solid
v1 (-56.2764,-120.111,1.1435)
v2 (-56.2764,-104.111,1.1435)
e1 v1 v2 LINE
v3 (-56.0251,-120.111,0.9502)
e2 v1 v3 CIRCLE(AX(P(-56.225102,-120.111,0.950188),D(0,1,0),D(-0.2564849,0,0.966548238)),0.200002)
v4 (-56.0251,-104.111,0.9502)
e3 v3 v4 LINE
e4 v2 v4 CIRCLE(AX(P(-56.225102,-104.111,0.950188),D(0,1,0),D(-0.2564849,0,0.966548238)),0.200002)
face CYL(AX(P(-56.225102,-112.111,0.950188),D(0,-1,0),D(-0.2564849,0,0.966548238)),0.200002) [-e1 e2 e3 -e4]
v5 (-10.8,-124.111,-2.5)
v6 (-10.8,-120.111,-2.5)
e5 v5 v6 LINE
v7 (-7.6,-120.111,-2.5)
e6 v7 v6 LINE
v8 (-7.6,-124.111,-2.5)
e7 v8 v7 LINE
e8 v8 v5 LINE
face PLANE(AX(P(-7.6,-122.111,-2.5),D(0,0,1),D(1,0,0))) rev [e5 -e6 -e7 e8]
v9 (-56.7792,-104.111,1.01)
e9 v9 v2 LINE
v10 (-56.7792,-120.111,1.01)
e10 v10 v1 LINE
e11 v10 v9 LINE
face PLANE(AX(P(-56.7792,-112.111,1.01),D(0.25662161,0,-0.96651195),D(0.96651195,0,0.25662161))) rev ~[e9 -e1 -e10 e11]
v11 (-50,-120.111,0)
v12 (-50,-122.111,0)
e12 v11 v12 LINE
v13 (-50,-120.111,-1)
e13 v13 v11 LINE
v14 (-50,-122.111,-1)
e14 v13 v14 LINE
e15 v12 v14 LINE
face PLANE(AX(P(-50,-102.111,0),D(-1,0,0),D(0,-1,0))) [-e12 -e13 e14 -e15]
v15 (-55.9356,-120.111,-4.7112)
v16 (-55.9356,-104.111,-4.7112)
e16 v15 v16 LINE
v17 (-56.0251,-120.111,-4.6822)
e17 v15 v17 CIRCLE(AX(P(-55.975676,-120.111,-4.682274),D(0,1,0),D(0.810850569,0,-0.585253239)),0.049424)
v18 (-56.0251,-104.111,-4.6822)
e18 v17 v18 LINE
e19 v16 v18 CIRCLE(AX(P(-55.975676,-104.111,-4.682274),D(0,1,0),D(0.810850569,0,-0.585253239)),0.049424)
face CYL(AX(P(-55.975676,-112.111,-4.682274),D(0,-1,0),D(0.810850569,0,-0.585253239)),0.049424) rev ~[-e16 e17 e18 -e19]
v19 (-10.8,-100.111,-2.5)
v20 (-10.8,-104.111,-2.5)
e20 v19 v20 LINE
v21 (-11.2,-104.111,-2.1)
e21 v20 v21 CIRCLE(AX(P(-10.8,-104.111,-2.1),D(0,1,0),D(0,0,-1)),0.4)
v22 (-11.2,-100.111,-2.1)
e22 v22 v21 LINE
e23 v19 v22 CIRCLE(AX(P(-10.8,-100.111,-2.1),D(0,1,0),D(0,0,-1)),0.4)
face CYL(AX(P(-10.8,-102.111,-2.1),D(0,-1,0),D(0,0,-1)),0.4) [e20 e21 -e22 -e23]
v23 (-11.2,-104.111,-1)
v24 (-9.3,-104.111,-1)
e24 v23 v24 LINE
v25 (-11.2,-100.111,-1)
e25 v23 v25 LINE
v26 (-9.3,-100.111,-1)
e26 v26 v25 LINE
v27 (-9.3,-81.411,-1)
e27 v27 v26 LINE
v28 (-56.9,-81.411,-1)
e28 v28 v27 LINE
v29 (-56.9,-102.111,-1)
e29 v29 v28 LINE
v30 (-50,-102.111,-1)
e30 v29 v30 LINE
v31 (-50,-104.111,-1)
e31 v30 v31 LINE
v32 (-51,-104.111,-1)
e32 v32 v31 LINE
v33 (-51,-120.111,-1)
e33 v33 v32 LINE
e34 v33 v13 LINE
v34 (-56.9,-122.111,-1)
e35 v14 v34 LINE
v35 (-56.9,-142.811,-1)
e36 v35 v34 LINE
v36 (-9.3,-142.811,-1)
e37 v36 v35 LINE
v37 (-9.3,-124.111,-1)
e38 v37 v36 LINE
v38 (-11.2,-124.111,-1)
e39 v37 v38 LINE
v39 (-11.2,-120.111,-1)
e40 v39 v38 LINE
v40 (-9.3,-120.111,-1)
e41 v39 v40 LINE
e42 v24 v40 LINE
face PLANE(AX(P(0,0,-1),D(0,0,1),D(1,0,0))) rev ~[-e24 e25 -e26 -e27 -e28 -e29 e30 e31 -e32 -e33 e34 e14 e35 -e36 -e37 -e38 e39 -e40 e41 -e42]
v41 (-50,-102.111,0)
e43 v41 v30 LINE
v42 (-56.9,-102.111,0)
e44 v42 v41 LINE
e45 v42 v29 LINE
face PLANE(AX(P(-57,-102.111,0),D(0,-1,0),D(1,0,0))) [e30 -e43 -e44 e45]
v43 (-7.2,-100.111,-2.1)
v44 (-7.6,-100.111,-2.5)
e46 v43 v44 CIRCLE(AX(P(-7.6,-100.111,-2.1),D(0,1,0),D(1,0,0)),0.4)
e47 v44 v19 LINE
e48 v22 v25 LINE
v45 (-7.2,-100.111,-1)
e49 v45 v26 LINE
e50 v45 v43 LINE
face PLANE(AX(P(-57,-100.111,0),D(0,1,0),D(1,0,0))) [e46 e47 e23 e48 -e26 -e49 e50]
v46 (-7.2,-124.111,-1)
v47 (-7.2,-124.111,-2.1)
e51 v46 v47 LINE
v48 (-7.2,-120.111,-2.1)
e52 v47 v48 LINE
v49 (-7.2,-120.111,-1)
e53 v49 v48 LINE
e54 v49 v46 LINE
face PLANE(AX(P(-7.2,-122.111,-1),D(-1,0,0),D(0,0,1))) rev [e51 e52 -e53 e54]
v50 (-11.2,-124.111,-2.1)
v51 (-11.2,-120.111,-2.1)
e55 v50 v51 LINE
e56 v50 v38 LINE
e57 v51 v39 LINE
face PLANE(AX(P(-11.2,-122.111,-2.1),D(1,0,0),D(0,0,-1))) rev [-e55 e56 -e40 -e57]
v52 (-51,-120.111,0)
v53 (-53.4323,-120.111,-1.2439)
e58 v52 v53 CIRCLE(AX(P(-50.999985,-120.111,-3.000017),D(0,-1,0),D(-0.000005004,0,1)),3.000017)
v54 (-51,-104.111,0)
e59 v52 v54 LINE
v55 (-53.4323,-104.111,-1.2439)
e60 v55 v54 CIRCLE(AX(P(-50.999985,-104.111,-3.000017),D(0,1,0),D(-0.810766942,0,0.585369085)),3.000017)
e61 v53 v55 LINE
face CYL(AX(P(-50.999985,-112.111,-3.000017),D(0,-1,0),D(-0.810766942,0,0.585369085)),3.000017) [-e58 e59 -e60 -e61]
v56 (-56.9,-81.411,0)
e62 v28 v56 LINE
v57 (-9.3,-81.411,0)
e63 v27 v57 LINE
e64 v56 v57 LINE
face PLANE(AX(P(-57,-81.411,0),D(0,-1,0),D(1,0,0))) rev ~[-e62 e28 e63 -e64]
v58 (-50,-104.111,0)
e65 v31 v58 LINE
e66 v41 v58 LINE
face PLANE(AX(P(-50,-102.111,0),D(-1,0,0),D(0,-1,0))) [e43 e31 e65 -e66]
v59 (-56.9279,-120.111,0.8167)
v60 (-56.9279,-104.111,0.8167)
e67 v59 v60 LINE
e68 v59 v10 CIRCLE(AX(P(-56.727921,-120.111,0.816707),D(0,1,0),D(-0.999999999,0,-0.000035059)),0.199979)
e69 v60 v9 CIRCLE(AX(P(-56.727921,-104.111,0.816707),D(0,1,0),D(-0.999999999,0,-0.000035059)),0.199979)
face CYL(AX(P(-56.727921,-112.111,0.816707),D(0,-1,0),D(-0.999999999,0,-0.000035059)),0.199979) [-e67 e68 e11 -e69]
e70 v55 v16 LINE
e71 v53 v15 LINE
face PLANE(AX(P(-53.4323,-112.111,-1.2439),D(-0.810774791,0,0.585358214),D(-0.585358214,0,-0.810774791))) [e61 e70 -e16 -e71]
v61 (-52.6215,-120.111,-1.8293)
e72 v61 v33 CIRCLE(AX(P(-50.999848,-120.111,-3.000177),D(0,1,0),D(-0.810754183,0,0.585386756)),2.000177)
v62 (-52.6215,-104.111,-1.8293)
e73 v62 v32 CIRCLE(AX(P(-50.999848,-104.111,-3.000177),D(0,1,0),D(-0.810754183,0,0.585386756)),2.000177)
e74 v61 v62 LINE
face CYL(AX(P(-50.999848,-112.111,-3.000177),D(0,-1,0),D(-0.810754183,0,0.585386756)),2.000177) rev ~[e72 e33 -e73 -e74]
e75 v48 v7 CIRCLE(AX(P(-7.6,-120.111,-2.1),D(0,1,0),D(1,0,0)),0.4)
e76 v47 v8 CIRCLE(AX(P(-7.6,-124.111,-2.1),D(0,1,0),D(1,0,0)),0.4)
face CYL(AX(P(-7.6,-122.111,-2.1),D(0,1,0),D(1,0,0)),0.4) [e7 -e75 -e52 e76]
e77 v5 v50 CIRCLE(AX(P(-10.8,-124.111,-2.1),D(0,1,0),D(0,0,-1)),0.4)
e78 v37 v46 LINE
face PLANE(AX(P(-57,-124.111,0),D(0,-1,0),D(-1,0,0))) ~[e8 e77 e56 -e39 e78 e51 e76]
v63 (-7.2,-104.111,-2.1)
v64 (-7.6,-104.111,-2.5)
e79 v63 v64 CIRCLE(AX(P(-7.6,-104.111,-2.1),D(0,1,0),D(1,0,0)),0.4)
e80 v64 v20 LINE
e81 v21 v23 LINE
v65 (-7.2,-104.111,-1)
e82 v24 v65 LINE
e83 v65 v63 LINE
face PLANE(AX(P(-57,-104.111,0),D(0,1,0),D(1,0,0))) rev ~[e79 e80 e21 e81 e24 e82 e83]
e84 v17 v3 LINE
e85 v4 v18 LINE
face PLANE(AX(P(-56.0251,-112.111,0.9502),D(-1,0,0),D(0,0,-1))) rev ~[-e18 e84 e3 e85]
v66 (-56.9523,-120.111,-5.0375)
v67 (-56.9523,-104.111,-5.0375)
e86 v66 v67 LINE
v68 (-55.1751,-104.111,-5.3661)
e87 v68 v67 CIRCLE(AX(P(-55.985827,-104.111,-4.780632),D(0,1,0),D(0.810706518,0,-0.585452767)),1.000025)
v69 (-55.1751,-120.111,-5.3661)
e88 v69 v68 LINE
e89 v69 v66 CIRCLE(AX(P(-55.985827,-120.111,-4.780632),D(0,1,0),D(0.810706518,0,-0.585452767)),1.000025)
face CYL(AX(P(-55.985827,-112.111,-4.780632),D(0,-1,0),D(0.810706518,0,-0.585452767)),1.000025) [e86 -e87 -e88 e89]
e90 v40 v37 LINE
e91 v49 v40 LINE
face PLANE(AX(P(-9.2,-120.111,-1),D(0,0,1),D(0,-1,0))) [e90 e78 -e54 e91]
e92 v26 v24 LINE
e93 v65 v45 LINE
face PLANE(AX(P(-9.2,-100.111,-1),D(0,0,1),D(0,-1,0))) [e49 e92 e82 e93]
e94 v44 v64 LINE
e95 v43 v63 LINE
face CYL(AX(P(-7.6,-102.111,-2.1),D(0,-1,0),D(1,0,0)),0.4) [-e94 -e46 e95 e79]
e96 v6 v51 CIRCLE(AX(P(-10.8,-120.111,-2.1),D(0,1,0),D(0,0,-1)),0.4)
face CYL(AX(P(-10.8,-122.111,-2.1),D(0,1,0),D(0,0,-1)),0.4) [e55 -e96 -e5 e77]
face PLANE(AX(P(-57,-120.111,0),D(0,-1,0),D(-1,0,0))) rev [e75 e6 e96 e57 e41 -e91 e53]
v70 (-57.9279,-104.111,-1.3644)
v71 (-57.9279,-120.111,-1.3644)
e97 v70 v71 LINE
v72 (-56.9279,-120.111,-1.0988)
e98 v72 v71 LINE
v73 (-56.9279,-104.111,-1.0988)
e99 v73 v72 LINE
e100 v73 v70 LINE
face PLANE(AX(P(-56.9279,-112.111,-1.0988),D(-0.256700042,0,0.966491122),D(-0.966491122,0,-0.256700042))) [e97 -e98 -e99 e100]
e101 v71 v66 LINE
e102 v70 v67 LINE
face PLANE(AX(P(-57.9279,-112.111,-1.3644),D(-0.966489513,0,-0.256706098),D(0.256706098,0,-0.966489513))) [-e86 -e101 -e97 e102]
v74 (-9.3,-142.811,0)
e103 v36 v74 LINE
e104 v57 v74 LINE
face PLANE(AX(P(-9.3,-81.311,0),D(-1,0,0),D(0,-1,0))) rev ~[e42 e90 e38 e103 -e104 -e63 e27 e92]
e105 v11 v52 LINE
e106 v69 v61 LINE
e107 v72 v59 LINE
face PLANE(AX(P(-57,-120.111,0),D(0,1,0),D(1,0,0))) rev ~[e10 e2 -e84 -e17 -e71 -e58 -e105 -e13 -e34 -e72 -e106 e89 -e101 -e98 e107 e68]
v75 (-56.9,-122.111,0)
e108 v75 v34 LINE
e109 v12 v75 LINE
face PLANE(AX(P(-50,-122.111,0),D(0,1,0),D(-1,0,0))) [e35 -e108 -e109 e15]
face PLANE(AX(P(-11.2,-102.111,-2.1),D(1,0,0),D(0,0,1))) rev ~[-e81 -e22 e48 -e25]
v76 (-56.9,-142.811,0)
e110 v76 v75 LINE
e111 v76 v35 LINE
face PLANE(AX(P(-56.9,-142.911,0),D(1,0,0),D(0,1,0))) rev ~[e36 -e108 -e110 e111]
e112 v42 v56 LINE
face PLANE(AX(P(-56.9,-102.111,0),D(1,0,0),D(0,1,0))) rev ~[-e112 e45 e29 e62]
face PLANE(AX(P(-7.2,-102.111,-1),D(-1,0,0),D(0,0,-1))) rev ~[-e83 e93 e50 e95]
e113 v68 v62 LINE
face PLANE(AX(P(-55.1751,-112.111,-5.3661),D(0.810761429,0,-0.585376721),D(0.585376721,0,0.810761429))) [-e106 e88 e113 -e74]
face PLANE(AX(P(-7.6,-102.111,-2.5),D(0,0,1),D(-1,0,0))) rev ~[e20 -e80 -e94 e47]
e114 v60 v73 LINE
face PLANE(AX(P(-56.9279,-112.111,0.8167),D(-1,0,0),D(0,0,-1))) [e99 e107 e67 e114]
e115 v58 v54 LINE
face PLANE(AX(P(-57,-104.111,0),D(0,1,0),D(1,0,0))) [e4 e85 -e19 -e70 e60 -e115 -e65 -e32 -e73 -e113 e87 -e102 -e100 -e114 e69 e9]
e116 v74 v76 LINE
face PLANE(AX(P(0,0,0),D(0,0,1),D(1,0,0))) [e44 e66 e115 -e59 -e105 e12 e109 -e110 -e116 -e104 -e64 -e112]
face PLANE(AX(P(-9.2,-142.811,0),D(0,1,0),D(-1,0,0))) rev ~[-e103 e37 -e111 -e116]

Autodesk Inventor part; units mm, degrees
ref_plane "YZ Plane" through (0, 0, 0) normal (1, 0, 0) x (0, 1, 0)
ref_plane "Work Plane1" through (0, 0, 0) normal (0, 0, 1) x (1, 0, 0)
sketch "Sketch1" plane through (0, 0, 0) normal (0, 0, 1) x (1, 0, 0)
  line L0 (-60, -142.911) -> (-60, -152.111) construction
  line L1 (0, -152.111) -> (-60, -152.111) construction
  line L2 (0, -142.911) -> (0, -152.111) construction
  line L3 (-57, -81.311) -> (-9.2, -81.311)
  line L4 (-9.2, -81.311) -> (-9.2, -142.911)
  line L5 (-9.2, -142.911) -> (-57, -142.911)
  line L6 (-57, -142.911) -> (-57, -81.311)
  line L7 (-57, -112.111) -> (-9.2, -112.111) construction
  line L8 (-57, -102.111) -> (-50, -102.111)
  line L9 (-50, -102.111) -> (-50, -122.111)
  line L10 (-50, -122.111) -> (-57, -122.111)
  line L11 (-57, -122.111) -> (-57, -102.111)
  line L12 (0, -142.911) -> (-60, -142.911) projected
  point P0 (0, 0)
  dimension "d0" = 20
  dimension "d1" = 7
extrude "Extrusion1" add sketch "Sketch1" against normal blind 1 contours L3 L4 L5 L6 L10 L9 L8
ref_plane "Work Plane2" through (-57, -112.111, 0) normal (0, 1, 0) x (1, 0, 0)
sketch "Sketch2" plane through (-57, -112.111, 0) normal (0, 1, 0) x (1, 0, 0)
  line L0 (7, 0) -> (0, 0) construction
  line L1 (7, 0) -> (7, 1) construction
  line L2 (0, 1) -> (7, 1) construction
  line L3 (0, 0) -> (0, 1) construction
  line L4 (0.0721, -0.8167) -> (0.0721, 1.0988)
  line L5 (0.0721, 1.0988) -> (-0.9279, 1.3644)
  line L6 (-0.9279, 1.3644) -> (0.0477, 5.0375)
  arc A0 (1.8249, 5.3661) -> (0.0477, 5.0375) centre (1.0142, 4.7807) ccw
  line L7 (1.8249, 5.3661) -> (4.3785, 1.8293)
  arc A1 (4.3785, 1.8293) -> (6, 1) centre (6, 3) ccw
  line L8 (6, 1) -> (7, 1)
  line L9 (7, 1) -> (7, 0)
  line L10 (7, 0) -> (6, 0)
  arc A2 (3.5677, 1.2439) -> (6, 0) centre (6, 3) ccw
  line L11 (3.5677, 1.2439) -> (1.0644, 4.7112)
  arc A3 (1.0644, 4.7112) -> (0.9749, 4.6822) centre (1.0243, 4.6822) ccw
  line L12 (47.8, 0) -> (0, 0) projected
  line L13 (47.8, 1) -> (0, 1) projected
  line L14 (6, 0) -> (6, 1) construction
  line L15 (0.9749, -0.9502) -> (0.9749, 4.6822)
  line L16 (0.2208, -1.01) -> (0.7236, -1.1435)
  arc A4 (0.7236, -1.1435) -> (0.9749, -0.9502) centre (0.7749, -0.9502) ccw
  arc A5 (0.0721, -0.8167) -> (0.2208, -1.01) centre (0.2721, -0.8167) ccw
  point P0 (57, 0)
  point P1 (0.9749, -1.2103)
  point P2 (0.0721, -0.9705)
  dimension "d8" = 1
  dimension "d9" = 1
  dimension "d11" = 1
  dimension "d12" = 0.0494
  dimension "d22" = 1
  dimension "d23" = 2
  dimension "d32" = 2
  dimension "d34" = 2.5
  dimension "d36" = 0.2
  dimension "d37" = 0.9874
  dimension "d38" = 1
  dimension "d39" = 125.829
  dimension "d40" = 3.8003
extrude "Extrusion2" add sketch "Sketch2" along normal mid plane 16 contours L4 L12 L15 A4 L16 A5 | L4 L13 L15 L12 | L4 L5 L6 A0 L7 A1 L13 A2 L11 A3 L15 | A2 L13 L8 L9 L10
ref_plane "Work Plane3" through (-57, -102.111, 0) normal (0, 1, 0) x (1, 0, 0)
sketch "Sketch4" plane through (-57, -102.111, 0) normal (0, 1, 0) x (1, 0, 0)
  line L0 (57, 0) -> (-3, 0) construction
  line L1 (0, 0) -> (47.8, 0) construction
  line L2 (47.8, 0) -> (47.8, 1) construction
  line L3 (0, 1) -> (47.8, 1) construction
  line L4 (0, 0) -> (0, 1) construction
  line L5 (0, 1) -> (47.8, 1) projected
  line L6 (45.8, 1) -> (47.8, 1)
  line L7 (47.8, 1) -> (49.8, 1)
  line L8 (49.8, 1) -> (49.8, 2.1)
  line L9 (49.4, 2.5) -> (46.2, 2.5)
  line L10 (45.8, 2.1) -> (45.8, 1)
  arc A0 (49.8, 2.1) -> (49.4, 2.5) centre (49.4, 2.1) ccw
  arc A1 (46.2, 2.5) -> (45.8, 2.1) centre (46.2, 2.1) ccw
  point P0 (49.8, 2.5)
  dimension "d25" = 1.5
  dimension "d26" = 2
  dimension "d27" = 2
  dimension "d28" = 0.4
extrude "Extrusion3" add sketch "Sketch4" along normal mid plane 4
mirror "Mirror1" about plane through (-57, -112.111, 0) normal (0, 1, 0) of "Extrusion3"
thicken "Thicken1" operation add thickness 0.1 both sides no extend neighbours yes toward (0, 1, 0) faces at (-25.1333, -142.911, -0.3333) (-57, -135.9777, -0.3333) (-9.2, -108.111, -0.3333) (-41.0667, -81.311, -0.3333) (-57, -95.1777, -0.3333)
equation "\"d8\" = d9"
properties part number "BAcA_3"
